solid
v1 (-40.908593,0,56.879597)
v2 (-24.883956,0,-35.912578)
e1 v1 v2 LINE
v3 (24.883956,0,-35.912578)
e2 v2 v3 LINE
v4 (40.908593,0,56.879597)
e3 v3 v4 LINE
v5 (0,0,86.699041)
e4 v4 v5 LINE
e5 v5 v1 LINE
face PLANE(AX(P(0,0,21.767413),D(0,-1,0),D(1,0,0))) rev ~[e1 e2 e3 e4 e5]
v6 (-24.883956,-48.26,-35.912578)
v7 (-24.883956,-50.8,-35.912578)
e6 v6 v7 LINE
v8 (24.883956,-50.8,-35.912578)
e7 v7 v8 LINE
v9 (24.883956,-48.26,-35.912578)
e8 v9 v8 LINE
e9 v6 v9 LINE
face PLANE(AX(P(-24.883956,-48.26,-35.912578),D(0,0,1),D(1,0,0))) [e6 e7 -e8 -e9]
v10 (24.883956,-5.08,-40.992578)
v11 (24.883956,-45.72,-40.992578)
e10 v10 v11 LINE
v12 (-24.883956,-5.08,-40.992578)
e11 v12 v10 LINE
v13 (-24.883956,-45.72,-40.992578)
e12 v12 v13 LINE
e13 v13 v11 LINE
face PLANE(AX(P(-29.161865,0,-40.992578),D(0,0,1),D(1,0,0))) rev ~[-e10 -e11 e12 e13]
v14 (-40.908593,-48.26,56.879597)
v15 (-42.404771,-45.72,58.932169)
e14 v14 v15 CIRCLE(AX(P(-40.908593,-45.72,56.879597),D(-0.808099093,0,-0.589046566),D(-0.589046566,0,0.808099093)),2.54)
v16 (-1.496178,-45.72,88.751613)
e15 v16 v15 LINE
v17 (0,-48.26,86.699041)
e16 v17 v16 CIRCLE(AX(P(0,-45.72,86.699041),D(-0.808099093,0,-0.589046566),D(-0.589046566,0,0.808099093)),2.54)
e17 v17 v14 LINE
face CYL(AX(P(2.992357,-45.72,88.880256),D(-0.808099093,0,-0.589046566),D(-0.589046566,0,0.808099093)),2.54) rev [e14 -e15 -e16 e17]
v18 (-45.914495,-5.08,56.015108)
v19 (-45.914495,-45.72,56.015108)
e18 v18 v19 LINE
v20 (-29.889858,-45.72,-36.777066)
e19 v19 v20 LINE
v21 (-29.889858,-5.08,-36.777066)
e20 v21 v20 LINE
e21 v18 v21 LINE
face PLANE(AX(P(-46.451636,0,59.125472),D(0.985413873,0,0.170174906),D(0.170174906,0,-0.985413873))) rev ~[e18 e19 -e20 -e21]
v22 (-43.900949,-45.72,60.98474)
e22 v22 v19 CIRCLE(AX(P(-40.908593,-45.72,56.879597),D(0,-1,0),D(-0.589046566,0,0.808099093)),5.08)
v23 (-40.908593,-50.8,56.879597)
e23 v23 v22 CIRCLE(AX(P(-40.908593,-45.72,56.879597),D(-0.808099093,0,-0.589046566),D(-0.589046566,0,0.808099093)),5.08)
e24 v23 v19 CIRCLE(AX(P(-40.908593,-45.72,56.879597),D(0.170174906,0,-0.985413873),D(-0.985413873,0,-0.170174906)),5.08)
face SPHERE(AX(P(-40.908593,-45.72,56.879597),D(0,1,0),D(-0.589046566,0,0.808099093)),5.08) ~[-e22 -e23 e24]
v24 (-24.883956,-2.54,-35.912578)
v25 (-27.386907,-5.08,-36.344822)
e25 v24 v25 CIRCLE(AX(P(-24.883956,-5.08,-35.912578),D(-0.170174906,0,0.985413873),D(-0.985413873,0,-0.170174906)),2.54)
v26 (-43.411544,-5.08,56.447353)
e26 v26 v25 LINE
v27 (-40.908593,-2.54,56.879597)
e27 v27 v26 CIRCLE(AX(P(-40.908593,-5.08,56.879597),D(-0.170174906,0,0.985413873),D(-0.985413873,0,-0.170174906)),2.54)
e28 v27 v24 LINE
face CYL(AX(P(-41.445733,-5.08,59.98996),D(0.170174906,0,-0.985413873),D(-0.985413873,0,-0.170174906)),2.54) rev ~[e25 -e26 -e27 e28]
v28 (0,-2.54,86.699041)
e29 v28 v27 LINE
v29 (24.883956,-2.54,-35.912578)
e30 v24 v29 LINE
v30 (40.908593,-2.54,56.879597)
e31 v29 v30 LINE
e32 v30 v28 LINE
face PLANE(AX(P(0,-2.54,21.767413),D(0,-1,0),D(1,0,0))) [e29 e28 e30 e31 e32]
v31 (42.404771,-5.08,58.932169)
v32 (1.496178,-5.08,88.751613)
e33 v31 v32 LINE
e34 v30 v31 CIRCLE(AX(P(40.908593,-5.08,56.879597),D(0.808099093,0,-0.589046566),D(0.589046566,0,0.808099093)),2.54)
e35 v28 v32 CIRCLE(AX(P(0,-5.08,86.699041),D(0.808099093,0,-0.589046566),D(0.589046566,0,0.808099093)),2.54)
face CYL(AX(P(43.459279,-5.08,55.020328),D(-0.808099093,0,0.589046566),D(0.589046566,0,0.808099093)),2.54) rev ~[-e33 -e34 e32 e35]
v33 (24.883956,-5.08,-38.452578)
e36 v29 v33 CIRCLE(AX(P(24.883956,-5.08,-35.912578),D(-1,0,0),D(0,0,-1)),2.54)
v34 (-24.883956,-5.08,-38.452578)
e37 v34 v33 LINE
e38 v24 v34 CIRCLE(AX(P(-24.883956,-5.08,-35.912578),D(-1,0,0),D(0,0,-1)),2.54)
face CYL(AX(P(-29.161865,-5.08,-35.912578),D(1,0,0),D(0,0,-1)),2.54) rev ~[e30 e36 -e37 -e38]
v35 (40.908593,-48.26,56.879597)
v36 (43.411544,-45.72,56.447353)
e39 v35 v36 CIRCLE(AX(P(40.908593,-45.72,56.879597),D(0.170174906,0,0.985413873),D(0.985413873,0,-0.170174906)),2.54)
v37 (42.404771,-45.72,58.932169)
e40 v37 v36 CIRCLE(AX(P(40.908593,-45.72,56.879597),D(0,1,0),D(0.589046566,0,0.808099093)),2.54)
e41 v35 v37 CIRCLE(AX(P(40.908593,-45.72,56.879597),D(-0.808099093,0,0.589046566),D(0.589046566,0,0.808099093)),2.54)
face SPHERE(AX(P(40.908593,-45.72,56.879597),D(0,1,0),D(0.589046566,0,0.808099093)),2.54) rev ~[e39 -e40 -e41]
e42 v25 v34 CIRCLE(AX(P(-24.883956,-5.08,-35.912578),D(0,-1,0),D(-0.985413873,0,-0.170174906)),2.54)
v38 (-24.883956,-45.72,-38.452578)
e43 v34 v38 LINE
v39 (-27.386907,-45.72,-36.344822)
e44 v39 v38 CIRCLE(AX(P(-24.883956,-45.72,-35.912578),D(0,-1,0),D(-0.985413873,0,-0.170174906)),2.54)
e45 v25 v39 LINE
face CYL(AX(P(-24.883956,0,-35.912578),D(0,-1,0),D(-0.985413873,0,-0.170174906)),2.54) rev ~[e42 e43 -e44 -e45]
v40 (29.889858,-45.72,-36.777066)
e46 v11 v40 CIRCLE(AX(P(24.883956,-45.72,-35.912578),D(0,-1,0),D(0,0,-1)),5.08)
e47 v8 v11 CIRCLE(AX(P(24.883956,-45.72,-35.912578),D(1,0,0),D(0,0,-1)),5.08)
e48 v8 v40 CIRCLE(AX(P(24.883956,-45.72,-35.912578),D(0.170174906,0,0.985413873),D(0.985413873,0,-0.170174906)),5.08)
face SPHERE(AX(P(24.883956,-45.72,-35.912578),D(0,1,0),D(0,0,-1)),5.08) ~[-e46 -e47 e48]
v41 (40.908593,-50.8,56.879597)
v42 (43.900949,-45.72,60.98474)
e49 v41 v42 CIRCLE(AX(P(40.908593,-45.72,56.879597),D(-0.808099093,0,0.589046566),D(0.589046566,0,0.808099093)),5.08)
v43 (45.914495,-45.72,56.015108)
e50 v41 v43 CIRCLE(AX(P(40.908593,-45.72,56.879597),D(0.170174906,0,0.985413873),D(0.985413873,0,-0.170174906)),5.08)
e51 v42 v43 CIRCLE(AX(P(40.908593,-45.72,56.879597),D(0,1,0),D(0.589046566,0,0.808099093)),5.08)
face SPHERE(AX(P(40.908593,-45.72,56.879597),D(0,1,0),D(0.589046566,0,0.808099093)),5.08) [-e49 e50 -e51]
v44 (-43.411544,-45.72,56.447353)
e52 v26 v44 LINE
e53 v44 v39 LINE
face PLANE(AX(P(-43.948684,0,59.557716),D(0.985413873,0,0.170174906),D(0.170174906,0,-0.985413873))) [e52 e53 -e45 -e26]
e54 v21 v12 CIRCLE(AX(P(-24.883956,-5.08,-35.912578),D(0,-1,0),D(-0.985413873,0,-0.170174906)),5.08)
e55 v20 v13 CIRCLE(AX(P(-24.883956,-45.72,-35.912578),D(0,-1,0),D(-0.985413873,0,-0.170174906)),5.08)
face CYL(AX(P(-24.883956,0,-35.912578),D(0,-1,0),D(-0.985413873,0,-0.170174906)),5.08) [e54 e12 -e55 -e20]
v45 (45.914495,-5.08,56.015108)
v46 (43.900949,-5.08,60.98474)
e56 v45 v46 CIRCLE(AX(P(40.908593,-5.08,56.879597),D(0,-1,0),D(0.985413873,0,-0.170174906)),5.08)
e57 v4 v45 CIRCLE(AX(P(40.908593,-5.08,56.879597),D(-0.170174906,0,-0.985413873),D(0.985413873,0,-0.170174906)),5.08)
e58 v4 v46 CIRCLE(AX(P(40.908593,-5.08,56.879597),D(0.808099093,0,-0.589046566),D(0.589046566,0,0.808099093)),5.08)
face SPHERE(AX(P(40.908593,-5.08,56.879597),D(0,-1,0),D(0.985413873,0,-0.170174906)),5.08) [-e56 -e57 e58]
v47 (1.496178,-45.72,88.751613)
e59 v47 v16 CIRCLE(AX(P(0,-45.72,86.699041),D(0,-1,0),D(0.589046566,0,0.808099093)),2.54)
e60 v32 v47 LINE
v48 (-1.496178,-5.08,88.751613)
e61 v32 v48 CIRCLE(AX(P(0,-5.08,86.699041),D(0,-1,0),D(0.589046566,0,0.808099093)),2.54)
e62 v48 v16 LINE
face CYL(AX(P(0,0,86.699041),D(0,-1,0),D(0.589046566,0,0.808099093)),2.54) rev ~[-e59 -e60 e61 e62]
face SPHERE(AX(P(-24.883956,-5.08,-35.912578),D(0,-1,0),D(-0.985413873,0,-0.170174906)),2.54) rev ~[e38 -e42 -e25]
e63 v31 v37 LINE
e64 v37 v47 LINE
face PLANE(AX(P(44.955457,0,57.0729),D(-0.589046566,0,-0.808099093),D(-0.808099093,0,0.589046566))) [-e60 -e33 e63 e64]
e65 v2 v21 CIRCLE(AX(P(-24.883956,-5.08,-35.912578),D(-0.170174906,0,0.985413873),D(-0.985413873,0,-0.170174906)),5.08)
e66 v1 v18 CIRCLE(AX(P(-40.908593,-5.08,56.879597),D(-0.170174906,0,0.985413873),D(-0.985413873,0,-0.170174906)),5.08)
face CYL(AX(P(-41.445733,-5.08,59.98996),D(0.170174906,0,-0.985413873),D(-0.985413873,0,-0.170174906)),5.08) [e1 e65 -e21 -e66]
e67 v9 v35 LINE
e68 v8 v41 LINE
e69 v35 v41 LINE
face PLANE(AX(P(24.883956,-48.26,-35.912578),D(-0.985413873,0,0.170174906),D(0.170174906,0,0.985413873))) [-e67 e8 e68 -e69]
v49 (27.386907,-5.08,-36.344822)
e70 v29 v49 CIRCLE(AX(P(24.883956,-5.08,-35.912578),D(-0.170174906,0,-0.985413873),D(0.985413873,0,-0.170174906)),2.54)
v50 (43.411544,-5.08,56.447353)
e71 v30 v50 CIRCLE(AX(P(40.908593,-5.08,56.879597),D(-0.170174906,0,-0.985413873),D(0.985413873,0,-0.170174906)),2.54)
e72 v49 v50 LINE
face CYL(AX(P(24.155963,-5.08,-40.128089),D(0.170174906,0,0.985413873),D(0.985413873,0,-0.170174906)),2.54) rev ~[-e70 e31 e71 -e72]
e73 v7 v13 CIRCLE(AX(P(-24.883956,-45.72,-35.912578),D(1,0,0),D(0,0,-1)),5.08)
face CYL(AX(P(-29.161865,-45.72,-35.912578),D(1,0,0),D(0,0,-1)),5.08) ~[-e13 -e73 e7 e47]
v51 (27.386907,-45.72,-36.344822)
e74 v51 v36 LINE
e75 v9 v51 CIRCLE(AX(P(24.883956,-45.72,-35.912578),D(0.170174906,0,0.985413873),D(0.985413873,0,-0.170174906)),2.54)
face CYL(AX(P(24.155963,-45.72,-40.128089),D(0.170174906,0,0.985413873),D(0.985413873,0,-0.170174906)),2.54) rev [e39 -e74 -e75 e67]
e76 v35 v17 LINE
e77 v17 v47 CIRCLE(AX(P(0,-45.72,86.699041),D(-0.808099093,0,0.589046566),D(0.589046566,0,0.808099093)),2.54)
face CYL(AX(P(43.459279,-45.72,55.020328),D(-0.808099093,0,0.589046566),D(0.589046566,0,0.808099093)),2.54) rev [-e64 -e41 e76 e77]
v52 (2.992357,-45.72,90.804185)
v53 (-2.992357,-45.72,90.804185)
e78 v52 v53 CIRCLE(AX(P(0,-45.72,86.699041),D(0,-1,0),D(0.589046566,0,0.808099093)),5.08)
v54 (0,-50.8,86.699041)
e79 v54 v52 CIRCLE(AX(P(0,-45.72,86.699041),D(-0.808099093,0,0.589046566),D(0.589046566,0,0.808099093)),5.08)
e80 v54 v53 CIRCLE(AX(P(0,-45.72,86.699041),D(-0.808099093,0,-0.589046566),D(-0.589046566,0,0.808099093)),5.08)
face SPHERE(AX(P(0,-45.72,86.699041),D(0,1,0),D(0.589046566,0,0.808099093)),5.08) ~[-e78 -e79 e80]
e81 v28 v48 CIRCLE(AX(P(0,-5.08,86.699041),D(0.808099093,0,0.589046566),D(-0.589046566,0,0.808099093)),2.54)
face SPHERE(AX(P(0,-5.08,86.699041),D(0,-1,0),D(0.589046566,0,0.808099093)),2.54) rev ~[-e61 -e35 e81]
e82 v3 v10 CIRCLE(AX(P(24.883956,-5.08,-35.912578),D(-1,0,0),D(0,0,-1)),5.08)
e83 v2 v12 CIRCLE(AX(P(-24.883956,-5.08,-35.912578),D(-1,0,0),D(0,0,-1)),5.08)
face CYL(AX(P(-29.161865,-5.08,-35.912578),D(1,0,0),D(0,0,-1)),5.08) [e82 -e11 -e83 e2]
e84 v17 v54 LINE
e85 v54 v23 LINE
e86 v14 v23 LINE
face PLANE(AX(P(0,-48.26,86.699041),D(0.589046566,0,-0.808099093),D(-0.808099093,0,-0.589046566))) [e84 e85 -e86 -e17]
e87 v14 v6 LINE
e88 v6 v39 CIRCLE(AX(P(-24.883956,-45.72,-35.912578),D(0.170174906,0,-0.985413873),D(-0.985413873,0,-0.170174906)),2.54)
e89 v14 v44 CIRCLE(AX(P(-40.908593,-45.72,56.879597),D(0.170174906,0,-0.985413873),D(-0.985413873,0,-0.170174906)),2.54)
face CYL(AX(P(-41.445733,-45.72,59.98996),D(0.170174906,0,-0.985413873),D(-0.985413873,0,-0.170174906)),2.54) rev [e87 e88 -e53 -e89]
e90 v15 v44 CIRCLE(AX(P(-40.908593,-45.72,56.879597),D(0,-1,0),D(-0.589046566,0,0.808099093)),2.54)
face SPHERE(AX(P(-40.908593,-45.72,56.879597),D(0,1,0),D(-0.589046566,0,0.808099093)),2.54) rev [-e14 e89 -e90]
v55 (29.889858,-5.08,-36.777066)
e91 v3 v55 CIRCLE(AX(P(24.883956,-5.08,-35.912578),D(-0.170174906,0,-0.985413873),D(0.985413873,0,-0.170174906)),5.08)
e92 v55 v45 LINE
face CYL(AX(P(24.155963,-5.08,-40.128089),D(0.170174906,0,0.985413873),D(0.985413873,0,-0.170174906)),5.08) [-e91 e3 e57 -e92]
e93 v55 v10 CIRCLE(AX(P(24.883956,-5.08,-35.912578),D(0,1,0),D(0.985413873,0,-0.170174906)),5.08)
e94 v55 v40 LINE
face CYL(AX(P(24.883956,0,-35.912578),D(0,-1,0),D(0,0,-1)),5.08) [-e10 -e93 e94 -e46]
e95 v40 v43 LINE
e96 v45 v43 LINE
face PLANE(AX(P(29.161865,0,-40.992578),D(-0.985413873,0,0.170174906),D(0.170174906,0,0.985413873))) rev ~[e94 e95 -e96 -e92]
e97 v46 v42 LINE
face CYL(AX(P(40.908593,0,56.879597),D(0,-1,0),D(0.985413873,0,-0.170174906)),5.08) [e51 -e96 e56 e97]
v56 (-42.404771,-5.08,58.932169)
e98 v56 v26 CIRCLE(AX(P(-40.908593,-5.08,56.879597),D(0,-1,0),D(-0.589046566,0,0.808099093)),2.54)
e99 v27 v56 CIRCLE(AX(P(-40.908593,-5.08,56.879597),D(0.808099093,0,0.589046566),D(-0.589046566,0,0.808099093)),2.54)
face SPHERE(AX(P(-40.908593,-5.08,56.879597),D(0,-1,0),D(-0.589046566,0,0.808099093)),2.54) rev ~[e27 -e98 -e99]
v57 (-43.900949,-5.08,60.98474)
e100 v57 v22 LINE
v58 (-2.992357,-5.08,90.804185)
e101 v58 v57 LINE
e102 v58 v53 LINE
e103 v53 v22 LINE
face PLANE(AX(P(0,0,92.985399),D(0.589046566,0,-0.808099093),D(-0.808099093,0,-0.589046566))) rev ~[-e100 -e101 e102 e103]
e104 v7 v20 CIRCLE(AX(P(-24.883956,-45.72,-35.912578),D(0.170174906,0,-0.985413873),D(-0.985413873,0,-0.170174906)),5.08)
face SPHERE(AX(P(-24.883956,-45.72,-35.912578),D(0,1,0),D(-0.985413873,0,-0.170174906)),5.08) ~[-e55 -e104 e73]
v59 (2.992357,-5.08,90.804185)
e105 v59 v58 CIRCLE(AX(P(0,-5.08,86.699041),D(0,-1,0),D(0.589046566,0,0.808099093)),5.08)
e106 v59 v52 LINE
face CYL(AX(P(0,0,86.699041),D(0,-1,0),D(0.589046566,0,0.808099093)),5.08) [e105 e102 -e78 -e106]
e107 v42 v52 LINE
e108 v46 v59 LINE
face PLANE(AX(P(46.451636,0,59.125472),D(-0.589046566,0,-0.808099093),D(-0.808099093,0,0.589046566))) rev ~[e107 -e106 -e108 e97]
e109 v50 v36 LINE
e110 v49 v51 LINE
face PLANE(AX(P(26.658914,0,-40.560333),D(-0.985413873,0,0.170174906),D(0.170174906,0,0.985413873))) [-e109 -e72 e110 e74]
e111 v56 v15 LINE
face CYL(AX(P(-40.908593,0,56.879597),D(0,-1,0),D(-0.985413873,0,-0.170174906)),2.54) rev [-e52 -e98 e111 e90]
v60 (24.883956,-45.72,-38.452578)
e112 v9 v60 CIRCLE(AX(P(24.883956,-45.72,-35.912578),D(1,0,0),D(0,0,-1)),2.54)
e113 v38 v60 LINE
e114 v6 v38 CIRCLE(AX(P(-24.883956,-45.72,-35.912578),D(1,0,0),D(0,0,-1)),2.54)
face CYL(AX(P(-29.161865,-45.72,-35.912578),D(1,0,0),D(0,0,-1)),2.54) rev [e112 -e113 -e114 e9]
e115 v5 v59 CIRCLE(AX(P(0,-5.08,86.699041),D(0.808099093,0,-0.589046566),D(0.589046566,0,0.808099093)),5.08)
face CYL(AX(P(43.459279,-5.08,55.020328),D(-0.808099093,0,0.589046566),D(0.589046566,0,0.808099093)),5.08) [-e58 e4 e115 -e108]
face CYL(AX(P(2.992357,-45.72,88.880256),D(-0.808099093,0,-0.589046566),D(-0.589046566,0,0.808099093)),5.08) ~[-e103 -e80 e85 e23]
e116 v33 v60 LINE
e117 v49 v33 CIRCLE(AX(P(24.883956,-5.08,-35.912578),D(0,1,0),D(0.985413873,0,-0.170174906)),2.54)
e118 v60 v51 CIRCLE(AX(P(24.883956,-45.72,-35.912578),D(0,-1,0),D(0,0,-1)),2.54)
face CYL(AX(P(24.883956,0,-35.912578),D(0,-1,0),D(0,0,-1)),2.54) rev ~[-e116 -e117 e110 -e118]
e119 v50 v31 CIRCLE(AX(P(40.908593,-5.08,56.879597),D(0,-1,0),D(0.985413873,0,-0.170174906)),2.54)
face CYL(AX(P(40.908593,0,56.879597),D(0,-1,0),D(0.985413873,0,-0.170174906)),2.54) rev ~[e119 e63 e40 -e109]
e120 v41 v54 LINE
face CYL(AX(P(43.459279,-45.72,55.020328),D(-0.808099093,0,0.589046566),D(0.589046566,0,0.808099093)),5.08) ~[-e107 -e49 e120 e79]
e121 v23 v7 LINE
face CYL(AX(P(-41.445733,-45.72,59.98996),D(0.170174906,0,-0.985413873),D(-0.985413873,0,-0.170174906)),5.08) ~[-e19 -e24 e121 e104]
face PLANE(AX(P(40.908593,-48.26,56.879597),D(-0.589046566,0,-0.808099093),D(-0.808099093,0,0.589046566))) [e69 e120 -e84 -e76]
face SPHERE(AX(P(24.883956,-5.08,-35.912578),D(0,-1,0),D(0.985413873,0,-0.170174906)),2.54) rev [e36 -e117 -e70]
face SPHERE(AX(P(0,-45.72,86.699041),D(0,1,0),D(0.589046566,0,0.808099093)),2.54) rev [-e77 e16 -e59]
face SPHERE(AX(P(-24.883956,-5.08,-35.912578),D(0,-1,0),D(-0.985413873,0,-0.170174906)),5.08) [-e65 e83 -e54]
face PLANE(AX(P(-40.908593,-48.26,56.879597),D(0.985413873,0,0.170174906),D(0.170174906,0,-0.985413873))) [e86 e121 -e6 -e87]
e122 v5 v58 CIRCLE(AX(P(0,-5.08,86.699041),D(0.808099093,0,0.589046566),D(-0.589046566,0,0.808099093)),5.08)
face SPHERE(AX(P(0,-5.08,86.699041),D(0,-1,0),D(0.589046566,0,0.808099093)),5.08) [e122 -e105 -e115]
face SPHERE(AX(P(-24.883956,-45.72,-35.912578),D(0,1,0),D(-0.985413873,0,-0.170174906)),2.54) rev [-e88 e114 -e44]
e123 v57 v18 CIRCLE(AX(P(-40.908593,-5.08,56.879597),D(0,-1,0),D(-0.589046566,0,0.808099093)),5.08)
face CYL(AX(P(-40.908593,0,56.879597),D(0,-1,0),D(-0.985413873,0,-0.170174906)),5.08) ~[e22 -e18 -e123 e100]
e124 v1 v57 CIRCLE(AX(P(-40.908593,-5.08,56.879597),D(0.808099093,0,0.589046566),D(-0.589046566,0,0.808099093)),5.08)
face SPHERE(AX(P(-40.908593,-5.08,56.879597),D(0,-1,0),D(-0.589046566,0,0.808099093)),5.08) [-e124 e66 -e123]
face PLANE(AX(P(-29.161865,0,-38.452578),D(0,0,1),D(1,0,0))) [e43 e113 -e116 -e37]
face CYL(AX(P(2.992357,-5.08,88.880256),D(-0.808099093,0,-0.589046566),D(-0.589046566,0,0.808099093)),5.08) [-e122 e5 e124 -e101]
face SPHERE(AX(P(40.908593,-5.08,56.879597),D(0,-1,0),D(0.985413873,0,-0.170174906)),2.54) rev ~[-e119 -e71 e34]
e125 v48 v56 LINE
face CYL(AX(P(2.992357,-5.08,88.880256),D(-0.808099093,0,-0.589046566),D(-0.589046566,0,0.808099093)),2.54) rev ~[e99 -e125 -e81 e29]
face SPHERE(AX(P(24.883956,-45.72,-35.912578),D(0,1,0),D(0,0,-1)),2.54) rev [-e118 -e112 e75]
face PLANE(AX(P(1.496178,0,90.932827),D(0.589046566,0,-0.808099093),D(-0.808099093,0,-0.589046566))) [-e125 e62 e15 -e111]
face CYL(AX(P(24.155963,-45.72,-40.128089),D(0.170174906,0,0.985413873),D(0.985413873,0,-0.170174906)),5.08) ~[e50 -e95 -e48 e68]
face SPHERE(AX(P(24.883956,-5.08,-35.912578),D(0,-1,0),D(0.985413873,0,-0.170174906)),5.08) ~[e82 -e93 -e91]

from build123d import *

# Parameters (mm, degrees)
F1_DEPTH = 50.8
F2_R     = 5.08
F3_T     = -2.54


# Not quite as in the source:
# - a shell that OpenCascade refuses in one call is made with other operations: the cavity is built on its own and cut out


with BuildPart() as f1:
    # F0 (on Front) → F1 (new body)
    with BuildSketch(Plane.XZ):
        Polygon((-46.4516356587, 59.1254718602), (-29.1618652595, -40.9925776591), (-21.6381347405, -40.9925776591), (21.6381347405, -40.9925776591), (29.1618652595, -40.9925776591), (46.4516356587, 59.1254718602), (0, 92.9853990674), align=None)
    extrude(amount=F1_DEPTH)

    # F2
    f2_edges = [f1.edges().sort_by_distance(p)[0] for p in [
        (23.225818, -50.8, 76.055435),
        (-23.225818, -50.8, 76.055435),
        (-37.80675, -50.8, 9.066447),
        (0, -50.8, -40.992578),
        (37.80675, -50.8, 9.066447),
        (29.161865, -25.4, -40.992578),
        (46.451636, -25.4, 59.125472),
        (37.80675, 0, 9.066447),
        (23.225818, 0, 76.055435),
        (-23.225818, 0, 76.055435),
        (-37.80675, 0, 9.066447),
        (0, 0, -40.992578),
        (-46.451636, -25.4, 59.125472),
        (-29.161865, -25.4, -40.992578),
        (0, -25.4, 92.985399),
    ]]
    fillet(f2_edges, radius=F2_R)

    # F3: a shell. OpenCascade refuses it in one call, so the cavity is built on its own and cut out:
    # the body offset inwards by the wall thickness, plus a prism from it out through each open face.
    f3_core = offset(f1.part, amount=F3_T, mode=Mode.PRIVATE)
    f3_exits = [f3_core.faces().sort_by_distance(p)[0] for p in [
        (0, -48.26, 23.00503),
    ]]
    add(f3_core, mode=Mode.SUBTRACT)
    extrude(f3_exits, amount=-F3_T, mode=Mode.SUBTRACT)


solid = f1.part
